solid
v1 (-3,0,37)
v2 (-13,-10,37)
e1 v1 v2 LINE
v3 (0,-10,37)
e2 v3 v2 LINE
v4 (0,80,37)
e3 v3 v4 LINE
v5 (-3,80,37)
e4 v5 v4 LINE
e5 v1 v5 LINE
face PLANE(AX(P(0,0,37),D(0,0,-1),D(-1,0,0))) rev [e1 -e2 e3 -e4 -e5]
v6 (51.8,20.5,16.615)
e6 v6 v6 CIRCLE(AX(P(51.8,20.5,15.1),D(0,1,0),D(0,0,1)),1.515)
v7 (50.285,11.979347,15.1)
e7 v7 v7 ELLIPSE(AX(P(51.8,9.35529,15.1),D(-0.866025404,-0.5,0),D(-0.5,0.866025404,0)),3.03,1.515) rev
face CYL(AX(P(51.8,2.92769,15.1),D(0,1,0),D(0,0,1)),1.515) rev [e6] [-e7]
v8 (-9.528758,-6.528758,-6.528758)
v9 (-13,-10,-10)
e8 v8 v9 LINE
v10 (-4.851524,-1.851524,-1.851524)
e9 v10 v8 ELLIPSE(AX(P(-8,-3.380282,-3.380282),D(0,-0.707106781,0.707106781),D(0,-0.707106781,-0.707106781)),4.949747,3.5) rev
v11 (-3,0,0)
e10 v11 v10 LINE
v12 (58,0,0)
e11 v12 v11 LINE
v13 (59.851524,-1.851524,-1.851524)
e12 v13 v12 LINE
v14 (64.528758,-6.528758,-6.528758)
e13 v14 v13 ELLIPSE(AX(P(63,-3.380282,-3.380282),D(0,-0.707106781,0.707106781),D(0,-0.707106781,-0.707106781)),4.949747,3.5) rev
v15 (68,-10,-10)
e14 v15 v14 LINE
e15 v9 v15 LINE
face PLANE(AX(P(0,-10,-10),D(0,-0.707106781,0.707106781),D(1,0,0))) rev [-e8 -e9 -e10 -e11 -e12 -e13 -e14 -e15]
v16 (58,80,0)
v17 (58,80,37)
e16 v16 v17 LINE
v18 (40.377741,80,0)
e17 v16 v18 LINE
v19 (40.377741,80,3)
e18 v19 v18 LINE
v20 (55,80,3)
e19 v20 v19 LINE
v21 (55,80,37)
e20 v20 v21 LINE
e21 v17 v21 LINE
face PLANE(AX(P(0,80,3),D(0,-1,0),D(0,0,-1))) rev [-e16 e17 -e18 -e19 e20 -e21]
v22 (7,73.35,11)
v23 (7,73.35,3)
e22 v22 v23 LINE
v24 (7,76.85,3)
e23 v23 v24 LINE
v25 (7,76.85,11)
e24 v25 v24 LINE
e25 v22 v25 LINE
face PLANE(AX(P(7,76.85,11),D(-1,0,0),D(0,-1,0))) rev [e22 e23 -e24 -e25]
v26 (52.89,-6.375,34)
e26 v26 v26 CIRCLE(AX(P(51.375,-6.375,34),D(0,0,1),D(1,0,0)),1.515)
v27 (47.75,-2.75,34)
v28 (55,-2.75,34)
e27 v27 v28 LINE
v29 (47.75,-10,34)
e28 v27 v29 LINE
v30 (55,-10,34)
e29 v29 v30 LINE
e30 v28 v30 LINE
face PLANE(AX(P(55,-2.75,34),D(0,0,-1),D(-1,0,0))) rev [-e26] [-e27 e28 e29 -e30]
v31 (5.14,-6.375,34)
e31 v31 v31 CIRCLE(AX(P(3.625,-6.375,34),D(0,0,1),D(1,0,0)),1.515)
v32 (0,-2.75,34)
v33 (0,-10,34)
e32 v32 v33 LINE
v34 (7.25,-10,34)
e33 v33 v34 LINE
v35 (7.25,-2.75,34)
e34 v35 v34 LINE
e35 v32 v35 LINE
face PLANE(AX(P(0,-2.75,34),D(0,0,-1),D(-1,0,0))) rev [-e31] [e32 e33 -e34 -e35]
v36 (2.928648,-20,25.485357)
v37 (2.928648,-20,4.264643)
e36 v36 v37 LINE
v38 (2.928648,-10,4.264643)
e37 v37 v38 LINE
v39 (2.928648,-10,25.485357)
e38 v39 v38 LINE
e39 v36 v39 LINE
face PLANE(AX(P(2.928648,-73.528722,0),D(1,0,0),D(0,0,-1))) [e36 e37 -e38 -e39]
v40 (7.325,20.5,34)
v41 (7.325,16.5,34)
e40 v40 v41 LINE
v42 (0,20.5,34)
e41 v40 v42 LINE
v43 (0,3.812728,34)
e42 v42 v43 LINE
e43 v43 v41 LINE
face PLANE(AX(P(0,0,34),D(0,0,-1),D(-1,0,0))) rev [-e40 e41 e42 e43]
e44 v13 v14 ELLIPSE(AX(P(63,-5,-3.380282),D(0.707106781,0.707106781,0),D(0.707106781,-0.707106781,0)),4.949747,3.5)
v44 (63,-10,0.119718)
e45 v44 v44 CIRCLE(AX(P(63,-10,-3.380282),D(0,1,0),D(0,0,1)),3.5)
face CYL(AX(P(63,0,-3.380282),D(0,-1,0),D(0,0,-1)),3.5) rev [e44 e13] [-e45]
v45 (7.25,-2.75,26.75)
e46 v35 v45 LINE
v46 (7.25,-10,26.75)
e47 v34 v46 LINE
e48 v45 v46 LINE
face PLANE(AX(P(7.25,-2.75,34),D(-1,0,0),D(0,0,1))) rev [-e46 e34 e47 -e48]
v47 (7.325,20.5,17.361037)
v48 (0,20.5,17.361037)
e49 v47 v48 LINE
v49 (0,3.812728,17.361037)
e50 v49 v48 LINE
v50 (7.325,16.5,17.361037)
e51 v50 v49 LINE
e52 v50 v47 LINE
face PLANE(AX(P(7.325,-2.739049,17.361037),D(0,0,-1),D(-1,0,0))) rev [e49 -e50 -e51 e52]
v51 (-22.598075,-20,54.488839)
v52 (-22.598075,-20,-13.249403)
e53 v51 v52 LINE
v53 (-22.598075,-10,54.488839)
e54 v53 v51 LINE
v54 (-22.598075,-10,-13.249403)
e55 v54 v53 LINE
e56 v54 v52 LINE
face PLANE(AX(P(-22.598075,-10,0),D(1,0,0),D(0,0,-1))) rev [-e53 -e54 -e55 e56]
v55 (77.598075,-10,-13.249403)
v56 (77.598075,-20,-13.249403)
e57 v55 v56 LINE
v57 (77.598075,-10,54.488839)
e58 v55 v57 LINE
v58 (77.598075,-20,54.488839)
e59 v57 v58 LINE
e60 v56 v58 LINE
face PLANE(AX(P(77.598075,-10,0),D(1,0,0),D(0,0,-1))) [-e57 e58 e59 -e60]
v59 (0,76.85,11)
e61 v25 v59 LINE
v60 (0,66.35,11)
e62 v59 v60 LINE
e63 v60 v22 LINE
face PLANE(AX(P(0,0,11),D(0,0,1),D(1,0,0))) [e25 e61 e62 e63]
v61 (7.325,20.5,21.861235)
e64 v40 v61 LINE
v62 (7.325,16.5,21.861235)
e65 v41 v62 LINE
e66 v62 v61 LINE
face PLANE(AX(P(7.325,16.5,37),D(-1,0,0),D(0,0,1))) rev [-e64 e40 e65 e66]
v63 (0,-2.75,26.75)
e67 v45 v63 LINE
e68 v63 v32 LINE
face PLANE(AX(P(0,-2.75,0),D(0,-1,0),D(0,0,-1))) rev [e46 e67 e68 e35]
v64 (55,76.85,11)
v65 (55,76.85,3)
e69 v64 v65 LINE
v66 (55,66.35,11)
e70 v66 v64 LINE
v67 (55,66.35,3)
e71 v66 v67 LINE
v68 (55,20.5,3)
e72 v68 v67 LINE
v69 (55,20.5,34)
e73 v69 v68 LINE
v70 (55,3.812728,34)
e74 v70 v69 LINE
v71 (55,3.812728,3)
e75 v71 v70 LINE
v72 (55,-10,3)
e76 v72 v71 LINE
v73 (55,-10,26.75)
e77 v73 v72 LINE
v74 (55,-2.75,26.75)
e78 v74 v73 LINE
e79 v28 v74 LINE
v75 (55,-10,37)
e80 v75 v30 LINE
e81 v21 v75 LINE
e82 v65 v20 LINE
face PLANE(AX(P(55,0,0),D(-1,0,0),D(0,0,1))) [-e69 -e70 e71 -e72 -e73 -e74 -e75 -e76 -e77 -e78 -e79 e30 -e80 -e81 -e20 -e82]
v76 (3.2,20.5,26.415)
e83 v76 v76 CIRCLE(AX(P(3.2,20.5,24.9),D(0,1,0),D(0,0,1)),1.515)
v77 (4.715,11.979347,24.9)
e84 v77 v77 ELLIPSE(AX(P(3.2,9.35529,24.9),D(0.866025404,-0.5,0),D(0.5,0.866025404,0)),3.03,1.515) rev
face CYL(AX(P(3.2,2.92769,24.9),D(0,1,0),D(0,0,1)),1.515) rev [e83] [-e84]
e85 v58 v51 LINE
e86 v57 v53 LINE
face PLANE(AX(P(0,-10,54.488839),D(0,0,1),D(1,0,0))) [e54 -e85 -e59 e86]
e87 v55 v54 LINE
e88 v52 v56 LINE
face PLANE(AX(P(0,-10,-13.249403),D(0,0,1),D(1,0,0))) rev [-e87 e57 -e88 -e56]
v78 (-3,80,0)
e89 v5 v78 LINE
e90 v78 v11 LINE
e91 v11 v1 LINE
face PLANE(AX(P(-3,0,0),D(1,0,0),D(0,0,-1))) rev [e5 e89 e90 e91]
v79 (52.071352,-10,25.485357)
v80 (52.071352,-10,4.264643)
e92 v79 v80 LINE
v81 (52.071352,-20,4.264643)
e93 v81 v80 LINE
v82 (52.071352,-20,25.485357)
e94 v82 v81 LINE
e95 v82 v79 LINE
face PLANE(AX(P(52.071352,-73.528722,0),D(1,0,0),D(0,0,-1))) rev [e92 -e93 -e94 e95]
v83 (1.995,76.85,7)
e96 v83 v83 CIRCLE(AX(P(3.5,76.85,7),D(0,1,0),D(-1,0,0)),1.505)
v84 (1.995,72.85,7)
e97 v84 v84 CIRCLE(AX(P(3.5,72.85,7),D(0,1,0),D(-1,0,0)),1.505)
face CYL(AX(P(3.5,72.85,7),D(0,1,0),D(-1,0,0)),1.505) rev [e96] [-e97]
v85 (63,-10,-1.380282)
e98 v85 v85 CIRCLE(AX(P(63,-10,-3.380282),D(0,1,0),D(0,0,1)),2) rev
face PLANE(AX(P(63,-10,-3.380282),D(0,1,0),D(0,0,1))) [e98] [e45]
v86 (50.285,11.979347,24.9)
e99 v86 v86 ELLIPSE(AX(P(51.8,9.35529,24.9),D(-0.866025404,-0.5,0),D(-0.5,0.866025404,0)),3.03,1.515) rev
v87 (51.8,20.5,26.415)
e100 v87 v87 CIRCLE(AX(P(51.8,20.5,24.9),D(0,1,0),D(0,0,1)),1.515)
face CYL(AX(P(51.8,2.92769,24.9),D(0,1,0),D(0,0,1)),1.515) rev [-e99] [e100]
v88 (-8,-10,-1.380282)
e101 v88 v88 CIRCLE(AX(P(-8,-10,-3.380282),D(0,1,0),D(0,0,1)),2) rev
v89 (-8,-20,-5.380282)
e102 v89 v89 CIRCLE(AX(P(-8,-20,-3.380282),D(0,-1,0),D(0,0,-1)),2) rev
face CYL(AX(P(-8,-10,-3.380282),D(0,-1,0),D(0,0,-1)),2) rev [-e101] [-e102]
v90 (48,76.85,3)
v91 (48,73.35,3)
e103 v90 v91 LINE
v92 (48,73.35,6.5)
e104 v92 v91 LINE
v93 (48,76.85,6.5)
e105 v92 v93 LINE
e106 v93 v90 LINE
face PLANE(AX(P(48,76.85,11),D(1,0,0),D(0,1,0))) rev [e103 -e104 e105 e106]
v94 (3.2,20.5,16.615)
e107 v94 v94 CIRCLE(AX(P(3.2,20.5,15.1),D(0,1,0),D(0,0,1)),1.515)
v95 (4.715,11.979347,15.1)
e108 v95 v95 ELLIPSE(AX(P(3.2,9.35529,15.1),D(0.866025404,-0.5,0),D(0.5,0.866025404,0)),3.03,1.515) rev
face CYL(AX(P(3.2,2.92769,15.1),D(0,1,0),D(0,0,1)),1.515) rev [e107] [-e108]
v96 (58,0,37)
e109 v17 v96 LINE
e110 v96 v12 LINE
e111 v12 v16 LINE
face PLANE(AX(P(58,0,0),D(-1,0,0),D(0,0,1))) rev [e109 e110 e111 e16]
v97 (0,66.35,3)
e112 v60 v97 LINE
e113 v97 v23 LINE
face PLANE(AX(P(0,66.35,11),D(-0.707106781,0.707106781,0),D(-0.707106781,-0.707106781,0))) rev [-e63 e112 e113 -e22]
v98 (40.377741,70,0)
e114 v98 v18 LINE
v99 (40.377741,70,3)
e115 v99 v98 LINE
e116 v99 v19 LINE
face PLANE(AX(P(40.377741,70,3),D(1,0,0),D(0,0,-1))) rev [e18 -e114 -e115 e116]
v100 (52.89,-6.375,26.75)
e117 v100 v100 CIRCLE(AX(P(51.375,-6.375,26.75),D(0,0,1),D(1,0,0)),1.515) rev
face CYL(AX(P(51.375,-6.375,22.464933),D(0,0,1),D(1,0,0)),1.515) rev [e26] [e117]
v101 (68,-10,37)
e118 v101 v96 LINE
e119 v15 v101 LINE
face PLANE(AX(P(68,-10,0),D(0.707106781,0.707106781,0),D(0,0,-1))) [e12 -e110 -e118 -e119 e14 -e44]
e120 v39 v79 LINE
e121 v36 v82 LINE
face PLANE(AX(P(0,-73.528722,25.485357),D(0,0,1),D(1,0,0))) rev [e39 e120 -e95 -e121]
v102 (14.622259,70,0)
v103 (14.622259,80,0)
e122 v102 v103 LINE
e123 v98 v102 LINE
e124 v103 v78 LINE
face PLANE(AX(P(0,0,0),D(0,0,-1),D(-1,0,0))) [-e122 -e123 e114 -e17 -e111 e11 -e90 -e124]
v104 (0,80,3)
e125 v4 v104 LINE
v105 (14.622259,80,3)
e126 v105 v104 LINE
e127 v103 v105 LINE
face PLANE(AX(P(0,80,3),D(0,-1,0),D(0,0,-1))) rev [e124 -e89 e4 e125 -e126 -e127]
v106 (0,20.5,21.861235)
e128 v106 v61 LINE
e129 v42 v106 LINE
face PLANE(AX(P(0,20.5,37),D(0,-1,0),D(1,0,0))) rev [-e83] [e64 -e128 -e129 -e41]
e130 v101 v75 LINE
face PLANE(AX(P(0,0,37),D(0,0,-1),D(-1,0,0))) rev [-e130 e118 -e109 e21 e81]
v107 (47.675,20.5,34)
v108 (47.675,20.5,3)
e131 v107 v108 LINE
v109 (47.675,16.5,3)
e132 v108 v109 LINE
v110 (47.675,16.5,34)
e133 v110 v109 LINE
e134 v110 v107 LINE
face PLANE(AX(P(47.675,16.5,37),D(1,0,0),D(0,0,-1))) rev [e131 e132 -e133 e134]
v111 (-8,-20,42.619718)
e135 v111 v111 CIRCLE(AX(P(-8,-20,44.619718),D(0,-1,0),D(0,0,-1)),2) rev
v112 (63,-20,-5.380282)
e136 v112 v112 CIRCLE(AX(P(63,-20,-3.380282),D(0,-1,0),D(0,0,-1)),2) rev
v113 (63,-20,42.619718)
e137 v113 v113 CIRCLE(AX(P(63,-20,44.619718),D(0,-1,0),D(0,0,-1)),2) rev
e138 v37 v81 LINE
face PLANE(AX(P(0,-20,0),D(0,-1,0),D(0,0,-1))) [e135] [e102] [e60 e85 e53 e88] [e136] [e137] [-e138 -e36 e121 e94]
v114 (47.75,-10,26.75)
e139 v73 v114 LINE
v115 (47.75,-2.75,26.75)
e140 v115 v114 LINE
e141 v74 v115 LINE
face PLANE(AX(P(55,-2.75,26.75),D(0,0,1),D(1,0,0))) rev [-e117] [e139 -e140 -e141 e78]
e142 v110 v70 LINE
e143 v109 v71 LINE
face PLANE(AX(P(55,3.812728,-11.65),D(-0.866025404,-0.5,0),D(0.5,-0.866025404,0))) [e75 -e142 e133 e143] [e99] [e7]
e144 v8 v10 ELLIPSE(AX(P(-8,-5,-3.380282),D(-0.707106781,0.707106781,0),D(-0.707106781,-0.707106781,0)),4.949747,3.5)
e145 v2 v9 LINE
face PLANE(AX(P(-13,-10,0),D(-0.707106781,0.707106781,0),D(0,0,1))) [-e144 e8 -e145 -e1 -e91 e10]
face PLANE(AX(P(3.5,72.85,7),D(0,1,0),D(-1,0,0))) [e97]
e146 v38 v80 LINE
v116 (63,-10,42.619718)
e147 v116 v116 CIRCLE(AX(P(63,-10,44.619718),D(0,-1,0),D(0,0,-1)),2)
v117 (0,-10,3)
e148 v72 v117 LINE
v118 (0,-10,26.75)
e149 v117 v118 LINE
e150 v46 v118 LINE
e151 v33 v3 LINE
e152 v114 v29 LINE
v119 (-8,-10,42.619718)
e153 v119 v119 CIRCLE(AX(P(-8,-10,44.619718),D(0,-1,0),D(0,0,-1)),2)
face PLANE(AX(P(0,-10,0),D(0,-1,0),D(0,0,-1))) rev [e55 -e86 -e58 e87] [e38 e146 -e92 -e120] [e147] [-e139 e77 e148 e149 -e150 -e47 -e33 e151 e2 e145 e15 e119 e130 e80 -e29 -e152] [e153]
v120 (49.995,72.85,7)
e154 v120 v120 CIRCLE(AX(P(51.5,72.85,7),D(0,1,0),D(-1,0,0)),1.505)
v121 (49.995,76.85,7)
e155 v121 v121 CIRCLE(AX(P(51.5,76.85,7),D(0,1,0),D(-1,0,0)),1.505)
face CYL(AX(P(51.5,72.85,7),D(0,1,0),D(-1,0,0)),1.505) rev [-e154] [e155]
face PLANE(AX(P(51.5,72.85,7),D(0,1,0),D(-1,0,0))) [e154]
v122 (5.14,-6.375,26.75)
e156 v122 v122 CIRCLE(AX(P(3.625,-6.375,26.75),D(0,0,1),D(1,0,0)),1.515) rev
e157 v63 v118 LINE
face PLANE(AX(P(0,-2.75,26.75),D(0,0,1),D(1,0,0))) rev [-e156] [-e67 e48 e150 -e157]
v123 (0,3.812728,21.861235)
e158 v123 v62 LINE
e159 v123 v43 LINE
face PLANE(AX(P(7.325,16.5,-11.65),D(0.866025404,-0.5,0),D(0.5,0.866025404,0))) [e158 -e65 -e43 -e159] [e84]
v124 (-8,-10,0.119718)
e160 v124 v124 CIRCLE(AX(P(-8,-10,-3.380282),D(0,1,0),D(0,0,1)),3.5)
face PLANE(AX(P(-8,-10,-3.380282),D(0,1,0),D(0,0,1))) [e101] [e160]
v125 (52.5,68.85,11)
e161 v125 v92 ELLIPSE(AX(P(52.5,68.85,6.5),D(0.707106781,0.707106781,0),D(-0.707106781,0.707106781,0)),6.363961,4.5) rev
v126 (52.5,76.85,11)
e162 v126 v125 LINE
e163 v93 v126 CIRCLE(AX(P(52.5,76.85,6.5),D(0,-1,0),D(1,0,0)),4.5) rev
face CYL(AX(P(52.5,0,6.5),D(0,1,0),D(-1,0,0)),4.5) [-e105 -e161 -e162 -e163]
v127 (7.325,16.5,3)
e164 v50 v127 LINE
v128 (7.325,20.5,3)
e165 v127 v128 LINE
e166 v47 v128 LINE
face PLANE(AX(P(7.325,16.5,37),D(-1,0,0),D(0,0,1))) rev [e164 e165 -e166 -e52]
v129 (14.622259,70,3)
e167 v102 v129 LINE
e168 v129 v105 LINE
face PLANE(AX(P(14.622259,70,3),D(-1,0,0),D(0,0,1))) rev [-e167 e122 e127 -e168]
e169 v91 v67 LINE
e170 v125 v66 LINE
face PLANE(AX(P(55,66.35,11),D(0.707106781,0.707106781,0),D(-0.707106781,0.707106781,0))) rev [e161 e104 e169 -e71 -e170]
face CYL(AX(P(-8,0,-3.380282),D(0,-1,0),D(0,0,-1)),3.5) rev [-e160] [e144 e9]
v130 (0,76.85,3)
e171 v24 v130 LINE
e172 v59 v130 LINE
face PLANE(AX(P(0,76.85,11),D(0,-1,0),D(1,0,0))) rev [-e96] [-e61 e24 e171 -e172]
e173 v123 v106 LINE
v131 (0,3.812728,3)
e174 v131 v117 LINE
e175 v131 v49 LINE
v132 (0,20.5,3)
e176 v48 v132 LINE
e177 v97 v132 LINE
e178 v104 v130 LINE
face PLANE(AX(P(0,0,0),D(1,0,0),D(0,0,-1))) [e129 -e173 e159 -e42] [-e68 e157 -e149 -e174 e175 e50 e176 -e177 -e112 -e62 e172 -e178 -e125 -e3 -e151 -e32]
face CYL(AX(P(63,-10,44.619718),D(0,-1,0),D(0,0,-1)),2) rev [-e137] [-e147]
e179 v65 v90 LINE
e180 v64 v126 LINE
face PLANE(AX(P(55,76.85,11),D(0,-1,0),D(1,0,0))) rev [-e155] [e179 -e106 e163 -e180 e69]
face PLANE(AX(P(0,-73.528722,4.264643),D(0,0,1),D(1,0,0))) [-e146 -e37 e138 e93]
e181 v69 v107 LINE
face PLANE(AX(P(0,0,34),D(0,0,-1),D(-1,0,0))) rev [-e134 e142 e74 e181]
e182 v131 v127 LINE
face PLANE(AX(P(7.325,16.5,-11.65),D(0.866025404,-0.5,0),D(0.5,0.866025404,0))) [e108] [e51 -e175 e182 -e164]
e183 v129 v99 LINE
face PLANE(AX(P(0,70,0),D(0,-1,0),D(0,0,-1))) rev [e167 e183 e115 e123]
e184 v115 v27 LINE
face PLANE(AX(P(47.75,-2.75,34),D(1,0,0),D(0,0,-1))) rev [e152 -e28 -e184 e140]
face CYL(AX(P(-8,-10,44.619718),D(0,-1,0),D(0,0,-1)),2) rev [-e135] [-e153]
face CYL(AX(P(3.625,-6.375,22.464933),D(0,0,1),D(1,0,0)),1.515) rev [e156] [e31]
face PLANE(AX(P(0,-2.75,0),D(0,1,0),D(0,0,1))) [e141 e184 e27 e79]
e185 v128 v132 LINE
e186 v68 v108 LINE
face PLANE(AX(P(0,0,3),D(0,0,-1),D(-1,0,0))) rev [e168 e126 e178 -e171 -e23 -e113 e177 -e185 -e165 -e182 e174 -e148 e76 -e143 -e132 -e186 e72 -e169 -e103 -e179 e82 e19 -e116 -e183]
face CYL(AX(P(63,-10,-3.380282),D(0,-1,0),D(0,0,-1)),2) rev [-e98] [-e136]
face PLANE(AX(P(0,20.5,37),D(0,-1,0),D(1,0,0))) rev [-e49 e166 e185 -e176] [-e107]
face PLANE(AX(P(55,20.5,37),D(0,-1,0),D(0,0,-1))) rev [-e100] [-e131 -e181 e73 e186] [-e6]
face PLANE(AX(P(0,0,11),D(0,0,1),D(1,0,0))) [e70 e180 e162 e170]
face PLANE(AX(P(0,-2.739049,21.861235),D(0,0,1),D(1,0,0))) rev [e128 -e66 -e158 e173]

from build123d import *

# Parameters (mm, degrees)
SKETCH1_W                = 55
SKETCH1_H                = 80
BACKPANEL_DEPTH          = 3
SKETCH2_W                = 7.325
SKETCH2_H                = 4
MOTORMOUNT_DEPTH         = 34
SKETCH3_W                = 37
SKETCH3_H                = 80
SIDEPANEL2_DEPTH         = 3
SKETCH4_W                = 37
SKETCH4_H                = 80
SIDEPANEL1_DEPTH         = 3
MOTORSUPPORTANGLES_DEPTH = 34
MOTORHOLESSET1_REACH     = 92.957
SKETCH5_R                = 1.515
MOTORHOLESSET2_REACH     = 92.957
SKETCH5_3_R              = 1.515
SKETCH7_W                = 61
SKETCH7_H                = 37
BOTTOMPLATE_DEPTH        = 3
SKETCH8_W                = 61
SKETCH8_H                = 3
CUT_EXTRUDE1_DEPTH       = 37
SKETCH20_W               = 100.196149356
SKETCH20_H               = 67.738241818
SKETCH20_R               = 2
BOSS_EXTRUDE8_DEPTH      = 20
BOSS_EXTRUDE10_DEPTH     = 10
BOSS_EXTRUDE11_DEPTH     = 8
SKETCH24_R               = 1.505
CUT_EXTRUDE6_DEPTH       = 4
SKETCH25_W               = 7.25
SKETCH25_H               = 7.25
BOSS_EXTRUDE12_DEPTH     = 7.25
SKETCH26_R               = 1.515
CUT_EXTRUDE7_DEPTH       = 7.25
CUT_EXTRUDE8_REACH       = 113.941
SKETCH27_W               = 7.325
SKETCH27_H               = 4.500198619
FILLET3_R                = 4.5
SKETCH28_W               = 55
SKETCH28_H               = 16.687272165
CUT_EXTRUDE9_DEPTH       = 3
SKETCH30_W               = 100.196149356
SKETCH30_H               = 67.738241818
CUT_EXTRUDE10_DEPTH      = 10
CHAMFER1_SIZE            = 10
CHAMFER2_SIZE            = 10
CHAMFER3_SIZE            = 10
SKETCH31_R               = 3.5
CUT_EXTRUDE11_DEPTH      = 10
SKETCH32_W               = 49.142704434
SKETCH32_H               = 21.220713278
CUT_EXTRUDE12_DEPTH      = 10
SKETCH33_W               = 25.755482036
SKETCH33_H               = 3
CUT_EXTRUDE13_DEPTH      = 10


with BuildPart() as part:
    # Sketch1 → BackPanel (new body)
    with BuildSketch(Plane.XY):
        with Locations((27.5, 40)):
            Rectangle(SKETCH1_W, SKETCH1_H)
    extrude(amount=BACKPANEL_DEPTH)

    # Sketch2 → MotorMount (add)
    with BuildSketch(Plane.XY.offset(3)):
        with Locations((3.6625, 18.5)):
            Rectangle(SKETCH2_W, SKETCH2_H)
        with Locations((51.3375, 18.5)):
            Rectangle(SKETCH2_W, SKETCH2_H)
    extrude(amount=MOTORMOUNT_DEPTH)

    # Sketch3 → SidePanel2 (add)
    with BuildSketch(Plane.ZY):
        with Locations((18.5, 40)):
            Rectangle(SKETCH3_W, SKETCH3_H)
    extrude(amount=SIDEPANEL2_DEPTH)

    # Sketch4 → SidePanel1 (add)
    with BuildSketch(Plane(origin=(55, 0, 0), x_dir=(0, 0, -1), z_dir=(1, 0, 0))):
        with Locations((-18.5, 40)):
            Rectangle(SKETCH4_W, SKETCH4_H)
    extrude(amount=SIDEPANEL1_DEPTH)

    # Sketch6 → MotorSupportAngles (add)
    with BuildSketch(Plane.XY.offset(37)):
        Polygon((7.325, 16.5), (0, 3.812727835), (0, 16.5), align=None)
        Polygon((47.675, 16.5), (55, 16.5), (55, 3.812727835), align=None)
    extrude(amount=-MOTORSUPPORTANGLES_DEPTH)

    # MotorHolesSet1: up to this plane
    motorholesset1_end = Plane(origin=(7.325, 16.5, -11.65), z_dir=(0.866025403784438, -0.5000000000000012, 0))
    # Sketch5 → MotorHolesSet1 (cut, up to the surface)
    with BuildSketch(Plane(origin=(0, 20.5, 0), x_dir=(1, 0, 0), z_dir=(0, 1, 0)), mode=Mode.PRIVATE) as motorholesset1_sk1:
        with Locations(Location((3.2, -15.1, 0), (0, 0, 270))):
            Circle(SKETCH5_R)
    motorholesset1_tool1 = split(extrude(motorholesset1_sk1.sketch, amount=-MOTORHOLESSET1_REACH, mode=Mode.PRIVATE), bisect_by=motorholesset1_end, keep=Keep.BOTH, mode=Mode.PRIVATE)
    add(motorholesset1_tool1.solids().sort_by_distance((3.2, 20.5, 15.1))[0], mode=Mode.SUBTRACT)
    # Sketch5 → MotorHolesSet1 (cut, up to the surface)
    with BuildSketch(Plane(origin=(0, 20.5, 0), x_dir=(1, 0, 0), z_dir=(0, 1, 0)), mode=Mode.PRIVATE) as motorholesset1_sk2:
        with Locations(Location((3.2, -24.9, 0), (0, 0, 270))):
            Circle(SKETCH5_R)
    motorholesset1_tool2 = split(extrude(motorholesset1_sk2.sketch, amount=-MOTORHOLESSET1_REACH, mode=Mode.PRIVATE), bisect_by=motorholesset1_end, keep=Keep.BOTH, mode=Mode.PRIVATE)
    add(motorholesset1_tool2.solids().sort_by_distance((3.2, 20.5, 24.9))[0], mode=Mode.SUBTRACT)

    # MotorHolesSet2: up to this plane
    motorholesset2_end = Plane(origin=(55, 3.812727835, -11.65), z_dir=(-0.866025403784438, -0.5000000000000011, 0))
    # Sketch5<3> → MotorHolesSet2 (cut, up to the surface)
    with BuildSketch(Plane(origin=(0, 20.5, 0), x_dir=(1, 0, 0), z_dir=(0, 1, 0)), mode=Mode.PRIVATE) as motorholesset2_sk1:
        with Locations(Location((51.8, -15.1, 0), (0, 0, 270))):
            Circle(SKETCH5_3_R)
    motorholesset2_tool1 = split(extrude(motorholesset2_sk1.sketch, amount=-MOTORHOLESSET2_REACH, mode=Mode.PRIVATE), bisect_by=motorholesset2_end, keep=Keep.BOTH, mode=Mode.PRIVATE)
    add(motorholesset2_tool1.solids().sort_by_distance((51.8, 20.5, 15.1))[0], mode=Mode.SUBTRACT)
    # Sketch5<3> → MotorHolesSet2 (cut, up to the surface)
    with BuildSketch(Plane(origin=(0, 20.5, 0), x_dir=(1, 0, 0), z_dir=(0, 1, 0)), mode=Mode.PRIVATE) as motorholesset2_sk2:
        with Locations(Location((51.8, -24.9, 0), (0, 0, 270))):
            Circle(SKETCH5_3_R)
    motorholesset2_tool2 = split(extrude(motorholesset2_sk2.sketch, amount=-MOTORHOLESSET2_REACH, mode=Mode.PRIVATE), bisect_by=motorholesset2_end, keep=Keep.BOTH, mode=Mode.PRIVATE)
    add(motorholesset2_tool2.solids().sort_by_distance((51.8, 20.5, 24.9))[0], mode=Mode.SUBTRACT)

    # Sketch7 → BottomPlate (add)
    with BuildSketch(Plane.XZ):
        with Locations((27.5, 18.5)):
            Rectangle(SKETCH7_W, SKETCH7_H)
    extrude(amount=BOTTOMPLATE_DEPTH)

    # Sketch8 → Cut-Extrude1 (cut)
    with BuildSketch(Plane.XY.offset(37)):
        with Locations((27.5, -1.5)):
            Rectangle(SKETCH8_W, SKETCH8_H)
    extrude(amount=-CUT_EXTRUDE1_DEPTH, mode=Mode.SUBTRACT)



with BuildPart() as body_2:
    # Sketch20 → Boss-Extrude8 (new body)
    with BuildSketch(Plane(origin=(0, -30, 0), x_dir=(-1, 0, 0), z_dir=(0, -1, 0))):
        with Locations((-27.5, -20.61971831)):
            Rectangle(SKETCH20_W, SKETCH20_H)
        with Locations(Location((8, -44.61971831, 0), (0, 0, 90))):
            Circle(SKETCH20_R, mode=Mode.SUBTRACT)
        with Locations(Location((-63, -44.61971831, 0), (0, 0, 90))):
            Circle(SKETCH20_R, mode=Mode.SUBTRACT)
        with Locations(Location((-63, 3.38028169, 0), (0, 0, 90))):
            Circle(SKETCH20_R, mode=Mode.SUBTRACT)
        with Locations(Location((8, 3.38028169, 0), (0, 0, 90))):
            Circle(SKETCH20_R, mode=Mode.SUBTRACT)
    extrude(amount=-BOSS_EXTRUDE8_DEPTH)


with BuildPart() as part_1:
    add(part.part)

    add(body_2.part)  # Boss-Extrude10 merges body 2
    # Sketch21 → Boss-Extrude10 (add)
    with BuildSketch(Plane.XZ):
        Polygon((-3, 0), (58, 0), (58, 37), (55, 37), (55, 3), (0, 3), (0, 37), (-3, 37), align=None)
    extrude(amount=BOSS_EXTRUDE10_DEPTH)

    # Sketch22 → Boss-Extrude11 (add)
    with BuildSketch(Plane.XY.offset(3)):
        Polygon((0, 76.85), (7, 76.85), (7, 73.35), (0, 66.35), align=None)
        Polygon((55, 76.85), (55, 66.35), (48, 73.35), (48, 76.85), align=None)
    extrude(amount=BOSS_EXTRUDE11_DEPTH)

    # Sketch24 → Cut-Extrude6 (cut)
    with BuildSketch(Plane(origin=(0, 76.85, 0), x_dir=(1, 0, 0), z_dir=(0, 1, 0))):
        with Locations(Location((3.5, -7, 0), (0, 0, 180))):
            Circle(SKETCH24_R)
        with Locations(Location((51.5, -7, 0), (0, 0, 180))):
            Circle(SKETCH24_R)
    extrude(amount=-CUT_EXTRUDE6_DEPTH, mode=Mode.SUBTRACT)

    # Sketch25 → Boss-Extrude12 (add)
    with BuildSketch(Plane(origin=(0, -10, 0), x_dir=(1, 0, 0), z_dir=(0, 1, 0))):
        with Locations((3.625, -30.375)):
            Rectangle(SKETCH25_W, SKETCH25_H)
        with Locations((51.375, -30.375)):
            Rectangle(SKETCH25_W, SKETCH25_H)
    extrude(amount=BOSS_EXTRUDE12_DEPTH)

    # Sketch26 → Cut-Extrude7 (cut)
    with BuildSketch(Plane.XY.offset(34)):
        with Locations((3.625, -6.375)):
            Circle(SKETCH26_R)
        with Locations((51.375, -6.375)):
            Circle(SKETCH26_R)
    extrude(amount=-CUT_EXTRUDE7_DEPTH, mode=Mode.SUBTRACT)

    # Cut-Extrude8: up to this plane
    cut_extrude8_end = Plane(origin=(7.325, 16.5, -11.65), z_dir=(0.866025403784438, -0.5000000000000012, 0))
    # Sketch27 → Cut-Extrude8 (cut, up to the surface)
    with BuildSketch(Plane(origin=(0, 20.5, 0), x_dir=(1, 0, 0), z_dir=(0, 1, 0)), mode=Mode.PRIVATE) as cut_extrude8_sk1:
        with Locations((3.6625, -19.611135977)):
            Rectangle(SKETCH27_W, SKETCH27_H)
    cut_extrude8_tool1 = split(extrude(cut_extrude8_sk1.sketch, amount=-CUT_EXTRUDE8_REACH, mode=Mode.PRIVATE), bisect_by=cut_extrude8_end, keep=Keep.BOTH, mode=Mode.PRIVATE)
    add(cut_extrude8_tool1.solids().sort_by_distance((3.6625, 20.5, 19.611136))[0], mode=Mode.SUBTRACT)

    # Fillet3
    fillet3_edges = [part_1.edges().sort_by_distance(p)[0] for p in [
        (48, 75.1, 11),
    ]]
    fillet(fillet3_edges, radius=FILLET3_R)

    # Sketch28 → Cut-Extrude9 (cut)
    with BuildSketch(Plane.XY.offset(37)):
        with Locations((27.5, 12.156363918)):
            Rectangle(SKETCH28_W, SKETCH28_H)
    extrude(amount=-CUT_EXTRUDE9_DEPTH, mode=Mode.SUBTRACT)

    # Sketch30 → Cut-Extrude10 (cut)
    with BuildSketch(Plane.XZ.offset(30)):
        with Locations((27.5, 20.61971831)):
            Rectangle(SKETCH30_W, SKETCH30_H)
    extrude(amount=-CUT_EXTRUDE10_DEPTH, mode=Mode.SUBTRACT)

    # Chamfer1
    chamfer1_edges = [part_1.edges().sort_by_distance(p)[0] for p in [
        (-3, -10, 18.5),
    ]]
    chamfer(chamfer1_edges, length=CHAMFER1_SIZE)

    # Chamfer2
    chamfer2_edges = [part_1.edges().sort_by_distance(p)[0] for p in [
        (58, -10, 18.5),
    ]]
    chamfer(chamfer2_edges, length=CHAMFER2_SIZE)

    # Chamfer3
    # the kernel refuses this chamfer: 10 mm, written as the material it adds along each edge
    with BuildSketch(Plane(origin=(-38.71682988, -10, 0), x_dir=(0, -0.027495876610586317, -0.9996219169112968), z_dir=(1, 0, 0))) as chamfer3_piece_1_section:
        Polygon((CHAMFER3_SIZE * 0.999621916911, CHAMFER3_SIZE * 0.0274958766106), (-CHAMFER3_SIZE * 0.0274958766106, CHAMFER3_SIZE * 0.999621916911), (0, 0), align=None)
    chamfer3_piece_1 = extrude(amount=132.433659759, mode=Mode.PRIVATE)
    chamfer3_piece_1 = split(chamfer3_piece_1, bisect_by=Plane(origin=(-8.165213201, -5.165213201, -8.521451905), z_dir=(0.7071067811865476, -0.7071067811865476, 0)), keep=Keep.TOP, mode=Mode.PRIVATE)
    chamfer3_piece_1 = chamfer3_piece_1 - Plane(origin=(-8, -8.616619282, -3.38028169), x_dir=(0, 0, -1), z_dir=(0, -1, 0)) * Cylinder(2, 305, mode=Mode.PRIVATE)
    chamfer3_piece_1 = split(chamfer3_piece_1, bisect_by=Plane(origin=(-3, -8.616619282, -8.521451905), z_dir=(-1, 0, 0)), keep=Keep.TOP, mode=Mode.PRIVATE)
    add(chamfer3_piece_1)
    with BuildSketch(Plane(origin=(-38.71682988, -10, 0), x_dir=(0, -0.027495876610586317, -0.9996219169112968), z_dir=(1, 0, 0))) as chamfer3_piece_2_section:
        Polygon((CHAMFER3_SIZE * 0.999621916911, CHAMFER3_SIZE * 0.0274958766106), (-CHAMFER3_SIZE * 0.0274958766106, CHAMFER3_SIZE * 0.999621916911), (0, 0), align=None)
    chamfer3_piece_2 = extrude(amount=132.433659759, mode=Mode.PRIVATE)
    chamfer3_piece_2 = split(chamfer3_piece_2, bisect_by=Plane(origin=(-3, -6.7021107, -3.297961008), z_dir=(1, 0, 0)), keep=Keep.TOP, mode=Mode.PRIVATE)
    chamfer3_piece_2 = split(chamfer3_piece_2, bisect_by=Plane(origin=(58, -6.7021107, -3.297961008), z_dir=(-1, 0, 0)), keep=Keep.TOP, mode=Mode.PRIVATE)
    add(chamfer3_piece_2)
    with BuildSketch(Plane(origin=(-38.71682988, -10, 0), x_dir=(0, -0.027495876610586317, -0.9996219169112968), z_dir=(1, 0, 0))) as chamfer3_piece_3_section:
        Polygon((CHAMFER3_SIZE * 0.999621916911, CHAMFER3_SIZE * 0.0274958766106), (-CHAMFER3_SIZE * 0.0274958766106, CHAMFER3_SIZE * 0.999621916911), (0, 0), align=None)
    chamfer3_piece_3 = extrude(amount=132.433659759, mode=Mode.PRIVATE)
    chamfer3_piece_3 = split(chamfer3_piece_3, bisect_by=Plane(origin=(64.879020319, -6.879020319, -8.521451905), z_dir=(-0.7071067811865476, -0.7071067811865476, 0)), keep=Keep.TOP, mode=Mode.PRIVATE)
    chamfer3_piece_3 = chamfer3_piece_3 - Plane(origin=(63, -8.616619283, -3.38028169), x_dir=(0, 0, -1), z_dir=(0, -1, 0)) * Cylinder(2, 305, mode=Mode.PRIVATE)
    chamfer3_piece_3 = split(chamfer3_piece_3, bisect_by=Plane(origin=(58, -8.616619283, -8.521451905), z_dir=(1, 0, 0)), keep=Keep.TOP, mode=Mode.PRIVATE)
    add(chamfer3_piece_3)

    # Sketch31 → Cut-Extrude11 (cut)
    with BuildSketch(Plane(origin=(0, -10, 0), x_dir=(1, 0, 0), z_dir=(0, 1, 0))):
        with Locations(Location((63, 3.38028169, 0), (0, 0, 64.100886192))):
            Circle(SKETCH31_R)
        with Locations(Location((-8, 3.38028169, 0), (0, 0, 115.899113808))):
            Circle(SKETCH31_R)
    extrude(amount=CUT_EXTRUDE11_DEPTH, mode=Mode.SUBTRACT)

    # Sketch32 → Cut-Extrude12 (cut)
    with BuildSketch(Plane(origin=(0, -10, 0), x_dir=(1, 0, 0), z_dir=(0, 1, 0))):
        with Locations((27.5, -14.875)):
            Rectangle(SKETCH32_W, SKETCH32_H)
    extrude(amount=-CUT_EXTRUDE12_DEPTH, mode=Mode.SUBTRACT)

    # Sketch33 → Cut-Extrude13 (cut)
    with BuildSketch(Plane(origin=(0, 80, 0), x_dir=(1, 0, 0), z_dir=(0, 1, 0))):
        with Locations((27.5, -1.5)):
            Rectangle(SKETCH33_W, SKETCH33_H)
    extrude(amount=-CUT_EXTRUDE13_DEPTH, mode=Mode.SUBTRACT)


solid = part_1.part
